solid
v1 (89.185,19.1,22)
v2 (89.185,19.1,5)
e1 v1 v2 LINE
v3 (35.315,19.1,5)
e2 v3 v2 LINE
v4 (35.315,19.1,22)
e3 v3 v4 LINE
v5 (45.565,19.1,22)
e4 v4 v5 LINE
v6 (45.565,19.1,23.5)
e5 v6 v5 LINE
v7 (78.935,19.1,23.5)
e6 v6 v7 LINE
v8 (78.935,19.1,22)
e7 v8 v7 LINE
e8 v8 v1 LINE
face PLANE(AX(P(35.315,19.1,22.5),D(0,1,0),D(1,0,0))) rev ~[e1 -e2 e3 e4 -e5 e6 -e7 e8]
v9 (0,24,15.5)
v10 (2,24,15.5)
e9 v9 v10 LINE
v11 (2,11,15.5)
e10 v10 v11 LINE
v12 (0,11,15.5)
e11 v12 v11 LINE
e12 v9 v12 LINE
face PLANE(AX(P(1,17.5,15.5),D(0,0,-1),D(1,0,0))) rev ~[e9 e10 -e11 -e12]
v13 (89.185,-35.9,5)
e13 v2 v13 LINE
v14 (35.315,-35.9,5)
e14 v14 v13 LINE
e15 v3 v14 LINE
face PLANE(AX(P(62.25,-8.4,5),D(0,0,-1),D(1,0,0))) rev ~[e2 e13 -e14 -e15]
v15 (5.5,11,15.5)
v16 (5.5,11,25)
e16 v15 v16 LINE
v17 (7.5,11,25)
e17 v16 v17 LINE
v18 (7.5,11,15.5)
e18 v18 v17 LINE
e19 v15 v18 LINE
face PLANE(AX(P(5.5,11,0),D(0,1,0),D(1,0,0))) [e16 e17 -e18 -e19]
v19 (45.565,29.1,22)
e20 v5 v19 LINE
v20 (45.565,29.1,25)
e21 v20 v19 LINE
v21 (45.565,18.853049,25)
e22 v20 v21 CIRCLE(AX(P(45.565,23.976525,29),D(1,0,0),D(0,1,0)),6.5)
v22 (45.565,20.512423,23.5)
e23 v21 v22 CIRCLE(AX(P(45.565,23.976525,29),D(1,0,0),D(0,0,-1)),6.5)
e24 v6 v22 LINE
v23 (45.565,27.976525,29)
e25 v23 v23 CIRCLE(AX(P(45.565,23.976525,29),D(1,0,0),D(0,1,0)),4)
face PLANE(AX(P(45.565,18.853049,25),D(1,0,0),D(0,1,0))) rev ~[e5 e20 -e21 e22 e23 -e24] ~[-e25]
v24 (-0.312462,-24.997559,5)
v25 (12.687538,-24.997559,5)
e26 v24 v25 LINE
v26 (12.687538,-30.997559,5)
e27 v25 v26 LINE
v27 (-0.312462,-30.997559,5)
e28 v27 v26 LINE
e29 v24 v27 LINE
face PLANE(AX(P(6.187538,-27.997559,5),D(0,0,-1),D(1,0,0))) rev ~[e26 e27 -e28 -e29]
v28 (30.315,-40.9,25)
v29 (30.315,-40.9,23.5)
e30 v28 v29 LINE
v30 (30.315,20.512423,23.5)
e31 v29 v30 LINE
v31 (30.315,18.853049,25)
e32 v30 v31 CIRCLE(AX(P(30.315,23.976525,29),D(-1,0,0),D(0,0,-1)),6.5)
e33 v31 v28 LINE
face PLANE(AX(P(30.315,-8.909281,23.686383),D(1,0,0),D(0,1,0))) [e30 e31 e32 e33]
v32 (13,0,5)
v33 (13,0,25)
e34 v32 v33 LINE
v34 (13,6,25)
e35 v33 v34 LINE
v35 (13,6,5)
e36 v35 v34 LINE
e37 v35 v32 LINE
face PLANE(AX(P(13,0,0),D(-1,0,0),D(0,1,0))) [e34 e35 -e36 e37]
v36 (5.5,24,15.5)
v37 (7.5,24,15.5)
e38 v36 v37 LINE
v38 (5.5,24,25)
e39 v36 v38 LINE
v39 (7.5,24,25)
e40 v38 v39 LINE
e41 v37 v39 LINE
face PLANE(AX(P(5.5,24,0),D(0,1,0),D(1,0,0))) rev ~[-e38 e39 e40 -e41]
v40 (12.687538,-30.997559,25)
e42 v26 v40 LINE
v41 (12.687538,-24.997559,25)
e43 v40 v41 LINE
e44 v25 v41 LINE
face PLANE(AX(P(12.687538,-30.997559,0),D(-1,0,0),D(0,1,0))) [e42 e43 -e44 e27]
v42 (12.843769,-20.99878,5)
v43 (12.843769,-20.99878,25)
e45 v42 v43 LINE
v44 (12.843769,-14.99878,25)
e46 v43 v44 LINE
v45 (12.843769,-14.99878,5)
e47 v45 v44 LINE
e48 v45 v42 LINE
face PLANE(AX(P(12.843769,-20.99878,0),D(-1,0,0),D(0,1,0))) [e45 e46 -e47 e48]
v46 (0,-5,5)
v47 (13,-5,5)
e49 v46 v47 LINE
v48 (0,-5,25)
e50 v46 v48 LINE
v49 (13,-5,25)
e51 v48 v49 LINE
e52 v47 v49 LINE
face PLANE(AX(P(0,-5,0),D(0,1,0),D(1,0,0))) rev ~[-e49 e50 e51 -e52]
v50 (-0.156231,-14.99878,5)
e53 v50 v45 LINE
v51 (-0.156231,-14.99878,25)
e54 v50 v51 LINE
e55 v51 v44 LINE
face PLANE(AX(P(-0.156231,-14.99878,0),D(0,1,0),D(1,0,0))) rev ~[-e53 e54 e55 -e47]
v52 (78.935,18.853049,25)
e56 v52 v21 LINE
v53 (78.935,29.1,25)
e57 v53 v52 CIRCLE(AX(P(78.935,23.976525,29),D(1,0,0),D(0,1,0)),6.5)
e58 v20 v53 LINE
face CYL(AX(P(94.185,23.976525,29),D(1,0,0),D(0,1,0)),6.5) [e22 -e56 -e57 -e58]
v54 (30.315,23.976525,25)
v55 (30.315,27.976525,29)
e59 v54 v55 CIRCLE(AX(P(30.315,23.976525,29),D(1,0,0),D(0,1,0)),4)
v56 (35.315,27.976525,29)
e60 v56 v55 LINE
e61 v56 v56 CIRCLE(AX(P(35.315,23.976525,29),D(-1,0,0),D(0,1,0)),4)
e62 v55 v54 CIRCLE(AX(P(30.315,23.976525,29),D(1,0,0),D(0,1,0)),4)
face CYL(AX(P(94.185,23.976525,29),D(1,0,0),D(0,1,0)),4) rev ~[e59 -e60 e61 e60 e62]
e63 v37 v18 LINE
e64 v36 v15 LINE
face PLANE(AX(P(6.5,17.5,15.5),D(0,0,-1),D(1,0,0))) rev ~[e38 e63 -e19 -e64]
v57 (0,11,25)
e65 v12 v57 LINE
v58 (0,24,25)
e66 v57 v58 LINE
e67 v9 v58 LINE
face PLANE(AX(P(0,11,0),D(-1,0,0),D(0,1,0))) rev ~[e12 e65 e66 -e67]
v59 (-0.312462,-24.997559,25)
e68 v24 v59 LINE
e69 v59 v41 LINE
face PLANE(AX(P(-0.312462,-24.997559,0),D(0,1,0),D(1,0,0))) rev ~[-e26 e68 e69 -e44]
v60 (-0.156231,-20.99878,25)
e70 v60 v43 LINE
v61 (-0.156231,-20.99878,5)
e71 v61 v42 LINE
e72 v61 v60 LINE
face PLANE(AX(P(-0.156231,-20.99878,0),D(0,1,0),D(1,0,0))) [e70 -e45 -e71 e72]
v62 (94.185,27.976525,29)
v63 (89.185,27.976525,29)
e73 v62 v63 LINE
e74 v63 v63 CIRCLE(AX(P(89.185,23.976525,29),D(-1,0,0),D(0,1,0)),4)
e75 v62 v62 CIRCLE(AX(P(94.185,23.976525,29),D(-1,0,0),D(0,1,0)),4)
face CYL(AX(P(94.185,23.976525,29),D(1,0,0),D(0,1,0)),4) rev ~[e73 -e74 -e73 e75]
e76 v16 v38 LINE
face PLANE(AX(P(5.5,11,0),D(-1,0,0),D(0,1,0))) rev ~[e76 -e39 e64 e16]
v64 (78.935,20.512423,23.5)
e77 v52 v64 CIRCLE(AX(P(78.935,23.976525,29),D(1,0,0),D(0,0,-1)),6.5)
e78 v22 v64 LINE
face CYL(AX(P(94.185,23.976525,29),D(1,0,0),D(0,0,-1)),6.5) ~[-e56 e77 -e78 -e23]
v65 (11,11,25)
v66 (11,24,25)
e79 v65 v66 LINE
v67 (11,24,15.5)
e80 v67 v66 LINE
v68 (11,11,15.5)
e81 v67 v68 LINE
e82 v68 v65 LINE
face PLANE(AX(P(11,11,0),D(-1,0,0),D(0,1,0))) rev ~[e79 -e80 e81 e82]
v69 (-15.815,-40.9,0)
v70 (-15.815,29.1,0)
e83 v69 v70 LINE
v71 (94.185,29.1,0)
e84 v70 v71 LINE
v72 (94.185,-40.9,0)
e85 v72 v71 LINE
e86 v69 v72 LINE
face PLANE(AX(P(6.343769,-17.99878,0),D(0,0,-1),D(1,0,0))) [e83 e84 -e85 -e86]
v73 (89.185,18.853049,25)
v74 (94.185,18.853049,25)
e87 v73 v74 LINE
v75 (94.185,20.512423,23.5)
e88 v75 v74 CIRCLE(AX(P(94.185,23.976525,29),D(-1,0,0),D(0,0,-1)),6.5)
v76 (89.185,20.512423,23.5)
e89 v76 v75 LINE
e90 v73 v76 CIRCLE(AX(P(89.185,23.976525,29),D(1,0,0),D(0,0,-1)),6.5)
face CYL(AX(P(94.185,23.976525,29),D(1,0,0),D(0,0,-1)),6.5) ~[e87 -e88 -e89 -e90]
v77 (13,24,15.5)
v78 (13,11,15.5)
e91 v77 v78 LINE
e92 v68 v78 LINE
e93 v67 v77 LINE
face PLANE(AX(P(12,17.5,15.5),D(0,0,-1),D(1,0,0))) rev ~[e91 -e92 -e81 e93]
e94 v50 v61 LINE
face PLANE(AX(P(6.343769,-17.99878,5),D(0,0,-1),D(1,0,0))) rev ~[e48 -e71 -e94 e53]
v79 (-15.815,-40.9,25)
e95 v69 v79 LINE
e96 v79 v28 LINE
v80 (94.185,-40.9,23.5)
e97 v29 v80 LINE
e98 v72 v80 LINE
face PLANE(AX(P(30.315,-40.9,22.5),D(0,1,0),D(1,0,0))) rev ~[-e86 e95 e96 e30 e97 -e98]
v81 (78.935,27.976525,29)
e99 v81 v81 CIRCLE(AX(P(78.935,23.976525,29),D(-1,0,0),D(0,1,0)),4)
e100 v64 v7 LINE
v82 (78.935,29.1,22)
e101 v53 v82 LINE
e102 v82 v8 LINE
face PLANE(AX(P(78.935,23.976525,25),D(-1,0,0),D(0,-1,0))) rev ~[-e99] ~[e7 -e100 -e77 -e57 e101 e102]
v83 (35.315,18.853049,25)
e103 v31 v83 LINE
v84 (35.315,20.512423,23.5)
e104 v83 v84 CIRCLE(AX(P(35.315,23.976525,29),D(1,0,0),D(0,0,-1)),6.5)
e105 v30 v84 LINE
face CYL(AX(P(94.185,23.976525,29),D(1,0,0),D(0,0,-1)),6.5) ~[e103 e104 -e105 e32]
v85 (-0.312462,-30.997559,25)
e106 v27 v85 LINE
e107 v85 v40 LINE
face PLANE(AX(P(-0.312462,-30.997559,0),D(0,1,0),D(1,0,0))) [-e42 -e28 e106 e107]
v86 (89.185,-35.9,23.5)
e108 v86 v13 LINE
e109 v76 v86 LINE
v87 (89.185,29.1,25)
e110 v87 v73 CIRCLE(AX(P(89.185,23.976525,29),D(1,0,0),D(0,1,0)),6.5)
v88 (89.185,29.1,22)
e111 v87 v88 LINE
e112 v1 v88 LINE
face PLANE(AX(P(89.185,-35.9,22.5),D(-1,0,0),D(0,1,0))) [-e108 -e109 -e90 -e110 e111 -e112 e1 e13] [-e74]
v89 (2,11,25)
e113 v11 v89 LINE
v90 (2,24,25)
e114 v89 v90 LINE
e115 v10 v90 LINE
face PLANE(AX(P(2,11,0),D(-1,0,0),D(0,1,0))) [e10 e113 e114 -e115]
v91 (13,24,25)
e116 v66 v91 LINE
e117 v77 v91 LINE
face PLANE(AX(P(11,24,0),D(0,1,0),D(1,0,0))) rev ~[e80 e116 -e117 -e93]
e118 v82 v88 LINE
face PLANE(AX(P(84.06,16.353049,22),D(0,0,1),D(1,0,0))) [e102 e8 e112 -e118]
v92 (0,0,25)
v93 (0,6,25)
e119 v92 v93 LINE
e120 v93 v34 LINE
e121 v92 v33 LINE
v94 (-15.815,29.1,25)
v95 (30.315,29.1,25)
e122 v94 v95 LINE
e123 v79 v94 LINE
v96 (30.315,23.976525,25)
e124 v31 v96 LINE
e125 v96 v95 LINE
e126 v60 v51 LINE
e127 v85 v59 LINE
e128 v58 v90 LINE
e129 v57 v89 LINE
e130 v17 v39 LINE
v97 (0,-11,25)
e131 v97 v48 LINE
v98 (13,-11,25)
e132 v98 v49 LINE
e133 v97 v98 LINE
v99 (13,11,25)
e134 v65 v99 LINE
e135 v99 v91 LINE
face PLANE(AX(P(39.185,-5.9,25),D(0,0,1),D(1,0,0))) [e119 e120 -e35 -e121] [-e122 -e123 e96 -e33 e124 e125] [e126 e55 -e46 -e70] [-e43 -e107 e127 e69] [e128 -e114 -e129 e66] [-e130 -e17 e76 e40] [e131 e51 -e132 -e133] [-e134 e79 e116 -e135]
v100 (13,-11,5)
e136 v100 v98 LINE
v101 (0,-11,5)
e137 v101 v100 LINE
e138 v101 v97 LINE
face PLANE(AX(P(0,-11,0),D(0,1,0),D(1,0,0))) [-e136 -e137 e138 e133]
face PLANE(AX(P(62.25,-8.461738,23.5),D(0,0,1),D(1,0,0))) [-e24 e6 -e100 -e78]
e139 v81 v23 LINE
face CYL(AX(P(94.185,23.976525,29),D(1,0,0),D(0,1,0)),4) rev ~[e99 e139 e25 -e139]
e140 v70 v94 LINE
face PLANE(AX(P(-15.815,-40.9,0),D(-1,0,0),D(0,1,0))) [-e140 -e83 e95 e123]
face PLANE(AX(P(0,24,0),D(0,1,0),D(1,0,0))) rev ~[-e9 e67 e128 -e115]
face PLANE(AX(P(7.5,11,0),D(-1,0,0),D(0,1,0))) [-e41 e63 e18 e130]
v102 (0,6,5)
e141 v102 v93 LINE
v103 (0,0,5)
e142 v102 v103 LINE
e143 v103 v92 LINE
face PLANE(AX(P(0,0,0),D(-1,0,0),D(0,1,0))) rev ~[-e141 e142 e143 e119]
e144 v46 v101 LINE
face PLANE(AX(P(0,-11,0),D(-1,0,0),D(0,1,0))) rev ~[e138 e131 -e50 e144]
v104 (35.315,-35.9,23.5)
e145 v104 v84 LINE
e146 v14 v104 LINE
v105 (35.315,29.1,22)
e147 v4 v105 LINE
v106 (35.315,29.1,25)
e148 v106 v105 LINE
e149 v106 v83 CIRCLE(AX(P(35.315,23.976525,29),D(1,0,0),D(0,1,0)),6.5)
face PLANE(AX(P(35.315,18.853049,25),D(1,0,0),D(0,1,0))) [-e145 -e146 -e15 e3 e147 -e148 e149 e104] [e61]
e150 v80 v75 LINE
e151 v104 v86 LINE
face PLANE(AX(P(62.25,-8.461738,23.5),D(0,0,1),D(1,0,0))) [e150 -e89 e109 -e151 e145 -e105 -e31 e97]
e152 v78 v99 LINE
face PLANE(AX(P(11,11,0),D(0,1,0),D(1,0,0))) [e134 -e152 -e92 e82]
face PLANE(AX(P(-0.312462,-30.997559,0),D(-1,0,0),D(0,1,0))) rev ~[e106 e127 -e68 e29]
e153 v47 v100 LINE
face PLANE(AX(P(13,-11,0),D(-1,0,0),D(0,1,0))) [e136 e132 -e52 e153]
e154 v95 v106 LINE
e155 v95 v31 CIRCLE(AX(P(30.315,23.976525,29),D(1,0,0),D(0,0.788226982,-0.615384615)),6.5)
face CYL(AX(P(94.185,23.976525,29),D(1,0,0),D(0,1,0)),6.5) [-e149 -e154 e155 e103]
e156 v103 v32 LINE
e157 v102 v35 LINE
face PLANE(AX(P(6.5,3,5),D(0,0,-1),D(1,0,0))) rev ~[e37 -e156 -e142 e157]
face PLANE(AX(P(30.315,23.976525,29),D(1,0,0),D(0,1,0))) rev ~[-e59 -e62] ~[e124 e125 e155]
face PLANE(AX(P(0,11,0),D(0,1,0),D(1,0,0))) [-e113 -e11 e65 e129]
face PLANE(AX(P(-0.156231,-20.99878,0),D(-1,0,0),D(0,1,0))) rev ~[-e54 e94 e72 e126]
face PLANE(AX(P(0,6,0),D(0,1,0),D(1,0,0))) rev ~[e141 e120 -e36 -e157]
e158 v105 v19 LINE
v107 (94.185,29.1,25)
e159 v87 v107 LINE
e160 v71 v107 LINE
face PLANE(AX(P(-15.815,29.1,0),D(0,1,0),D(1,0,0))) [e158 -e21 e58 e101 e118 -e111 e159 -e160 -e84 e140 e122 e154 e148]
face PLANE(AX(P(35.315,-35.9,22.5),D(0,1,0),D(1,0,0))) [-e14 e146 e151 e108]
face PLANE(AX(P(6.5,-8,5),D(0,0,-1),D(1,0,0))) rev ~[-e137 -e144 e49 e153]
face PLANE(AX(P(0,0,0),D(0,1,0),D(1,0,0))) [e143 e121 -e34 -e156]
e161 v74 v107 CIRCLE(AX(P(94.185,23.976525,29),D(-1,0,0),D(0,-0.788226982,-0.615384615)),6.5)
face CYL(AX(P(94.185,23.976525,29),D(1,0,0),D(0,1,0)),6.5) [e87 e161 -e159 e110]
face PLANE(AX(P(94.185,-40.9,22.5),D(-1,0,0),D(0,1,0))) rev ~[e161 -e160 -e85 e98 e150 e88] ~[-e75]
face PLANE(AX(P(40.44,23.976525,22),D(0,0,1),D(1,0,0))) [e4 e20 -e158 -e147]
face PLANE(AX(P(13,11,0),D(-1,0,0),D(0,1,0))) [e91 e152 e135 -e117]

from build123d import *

# Parameters (mm, degrees)
F0_W      = 110
F0_H      = 70
F0_W_2    = 13
F0_H_2    = 6
F0_W_3    = 53.87
F0_H_3    = 55
F0_W_4    = 2
F0_H_4    = 13
F1_DEPTH  = 25
F2_W      = 53.87
F2_H      = 55
F2_W_2    = 13
F2_H_2    = 6
F3_DEPTH  = 5
F4_W      = 2
F4_H      = 13
F5_DEPTH  = 15.5
F6_R      = 6.5
F6_R_2    = 4
F7_DEPTH  = 63.87
F8_W      = 10.25
F8_H      = 10.246950766
F8_H_2    = 5
F9_DEPTH  = 25
F11_DEPTH = 63.87
F12_W     = 63.8700000004
F12_H     = 64.876524617
F12_W_2   = 53.87
F12_H_2   = 55
F13_DEPTH = 1
F14_W     = 10.25
F14_H     = 10.246950766
F15_DEPTH = 3
F16_DEPTH = 3
F17_W     = 13
F17_H     = 6
F18_DEPTH = 5


# Not quite as in the source:
# - a feature names something its author has since deleted; it is built from what else it names


with BuildPart() as f1:
    # F0 (on Top) → F1 (new body)
    with BuildSketch(Plane.XY):
        with Locations((39.185, -5.9)):
            Rectangle(F0_W, F0_H)
        with Locations((6.18753814, -27.9975590407)):
            Rectangle(F0_W_2, F0_H_2, mode=Mode.SUBTRACT)
        with Locations((6.34376907, -17.9987795203)):
            Rectangle(F0_W_2, F0_H_2, mode=Mode.SUBTRACT)
        with Locations((6.5, -8)):
            Rectangle(F0_W_2, F0_H_2, mode=Mode.SUBTRACT)
        with Locations((62.25, -8.4)):
            Rectangle(F0_W_3, F0_H_3, mode=Mode.SUBTRACT)
        with Locations((6.5, 3)):
            Rectangle(F0_W_2, F0_H_2, mode=Mode.SUBTRACT)
        with Locations((1, 17.5)):
            Rectangle(F0_W_4, F0_H_4, mode=Mode.SUBTRACT)
        with Locations((6.5, 17.5)):
            Rectangle(F0_W_4, F0_H_4, mode=Mode.SUBTRACT)
        with Locations((12, 17.5)):
            Rectangle(F0_W_4, F0_H_4, mode=Mode.SUBTRACT)
    extrude(amount=F1_DEPTH)

    # F2 (on face) → F3 (join)
    with BuildSketch(Plane(origin=(0, 0, 0), x_dir=(1, 0, 0), z_dir=(0, 0, -1))):
        with Locations((62.25, 8.4)):
            Rectangle(F2_W, F2_H)
        with Locations((6.5, -3)):
            Rectangle(F2_W_2, F2_H_2)
        with Locations((6.5, 8)):
            Rectangle(F2_W_2, F2_H_2)
    extrude(amount=-F3_DEPTH)

    # F4 (on face) → F5 (join)
    with BuildSketch(Plane(origin=(0, 0, 0), x_dir=(1, 0, 0), z_dir=(0, 0, -1))):
        with Locations((12, -17.5)):
            Rectangle(F4_W, F4_H)
        with Locations((6.5, -17.5)):
            Rectangle(F4_W, F4_H)
        with Locations((1, -17.5)):
            Rectangle(F4_W, F4_H)
    extrude(amount=-F5_DEPTH)

    # F6 (on face) → F7 (join)
    with BuildSketch(Plane.YZ.offset(94.185)):
        with Locations((23.976524617, 29)):
            Circle(F6_R)
        with Locations((23.976524617, 29)):
            Circle(F6_R_2, mode=Mode.SUBTRACT)
    extrude(amount=-F7_DEPTH)

    # F8 (on face) → F9 (cut)
    with BuildSketch(Plane.XY.offset(25)):
        with Locations((40.44, 23.976524617)):
            Rectangle(F8_W, F8_H)
        with Locations((40.44, 16.353049234)):
            Rectangle(F8_W, F8_H_2)
        with Locations((40.44, 31.6)):
            Rectangle(F8_W, F8_H_2)
        with Locations((84.06, 16.353049234)):
            Rectangle(F8_W, F8_H_2)
        with Locations((84.06, 23.976524617)):
            Rectangle(F8_W, F8_H)
        with Locations((84.06, 31.6)):
            Rectangle(F8_W, F8_H_2)
    extrude(amount=F9_DEPTH, mode=Mode.SUBTRACT)

    # F10 (on face) → F11 (cut, through all)
    with BuildSketch(Plane.YZ.offset(94.185)):
        with BuildLine():
            ThreePointArc((23.976524617, 22.5), (21.1260860543, 23.1583392772), (18.853049234, 25))
            Line((18.853049234, 25), (-40.9, 25))
            Line((-40.9, 25), (-40.9, 22.5))
            Line((-40.9, 22.5), (23.976524617, 22.5))
        make_face()
    extrude(amount=-F11_DEPTH, mode=Mode.SUBTRACT)

    # F12 (on face) → F13 (join)
    with BuildSketch(Plane.XY.offset(22.5)):
        with Locations((62.2499999998, -8.4617376915)):
            Rectangle(F12_W, F12_H)
        with Locations((62.25, -8.4)):
            Rectangle(F12_W_2, F12_H_2, mode=Mode.SUBTRACT)
    extrude(amount=F13_DEPTH)

    # F14 (on face) → F15 (cut)
    with BuildSketch(Plane.XY.offset(25)):
        with Locations((40.44, 23.976524617)):
            Rectangle(F14_W, F14_H)
    extrude(amount=-F15_DEPTH, mode=Mode.SUBTRACT)

    # F16 (cut): a face of the model
    f16_faces = [f1.faces().sort_by_distance(p)[0] for p in [
        (84.06, 23.976524617, 25),
    ]]
    extrude(f16_faces, amount=-F16_DEPTH, mode=Mode.SUBTRACT)

    # F17 (on face) → F18 (join)
    with BuildSketch(Plane(origin=(0, 0, 0), x_dir=(1, 0, 0), z_dir=(0, 0, -1))):
        with Locations((6.34376907, 17.9987795203)):
            Rectangle(F17_W, F17_H)
        with Locations((6.18753814, 27.9975590407)):
            Rectangle(F17_W, F17_H)
    extrude(amount=-F18_DEPTH)


solid = f1.part
